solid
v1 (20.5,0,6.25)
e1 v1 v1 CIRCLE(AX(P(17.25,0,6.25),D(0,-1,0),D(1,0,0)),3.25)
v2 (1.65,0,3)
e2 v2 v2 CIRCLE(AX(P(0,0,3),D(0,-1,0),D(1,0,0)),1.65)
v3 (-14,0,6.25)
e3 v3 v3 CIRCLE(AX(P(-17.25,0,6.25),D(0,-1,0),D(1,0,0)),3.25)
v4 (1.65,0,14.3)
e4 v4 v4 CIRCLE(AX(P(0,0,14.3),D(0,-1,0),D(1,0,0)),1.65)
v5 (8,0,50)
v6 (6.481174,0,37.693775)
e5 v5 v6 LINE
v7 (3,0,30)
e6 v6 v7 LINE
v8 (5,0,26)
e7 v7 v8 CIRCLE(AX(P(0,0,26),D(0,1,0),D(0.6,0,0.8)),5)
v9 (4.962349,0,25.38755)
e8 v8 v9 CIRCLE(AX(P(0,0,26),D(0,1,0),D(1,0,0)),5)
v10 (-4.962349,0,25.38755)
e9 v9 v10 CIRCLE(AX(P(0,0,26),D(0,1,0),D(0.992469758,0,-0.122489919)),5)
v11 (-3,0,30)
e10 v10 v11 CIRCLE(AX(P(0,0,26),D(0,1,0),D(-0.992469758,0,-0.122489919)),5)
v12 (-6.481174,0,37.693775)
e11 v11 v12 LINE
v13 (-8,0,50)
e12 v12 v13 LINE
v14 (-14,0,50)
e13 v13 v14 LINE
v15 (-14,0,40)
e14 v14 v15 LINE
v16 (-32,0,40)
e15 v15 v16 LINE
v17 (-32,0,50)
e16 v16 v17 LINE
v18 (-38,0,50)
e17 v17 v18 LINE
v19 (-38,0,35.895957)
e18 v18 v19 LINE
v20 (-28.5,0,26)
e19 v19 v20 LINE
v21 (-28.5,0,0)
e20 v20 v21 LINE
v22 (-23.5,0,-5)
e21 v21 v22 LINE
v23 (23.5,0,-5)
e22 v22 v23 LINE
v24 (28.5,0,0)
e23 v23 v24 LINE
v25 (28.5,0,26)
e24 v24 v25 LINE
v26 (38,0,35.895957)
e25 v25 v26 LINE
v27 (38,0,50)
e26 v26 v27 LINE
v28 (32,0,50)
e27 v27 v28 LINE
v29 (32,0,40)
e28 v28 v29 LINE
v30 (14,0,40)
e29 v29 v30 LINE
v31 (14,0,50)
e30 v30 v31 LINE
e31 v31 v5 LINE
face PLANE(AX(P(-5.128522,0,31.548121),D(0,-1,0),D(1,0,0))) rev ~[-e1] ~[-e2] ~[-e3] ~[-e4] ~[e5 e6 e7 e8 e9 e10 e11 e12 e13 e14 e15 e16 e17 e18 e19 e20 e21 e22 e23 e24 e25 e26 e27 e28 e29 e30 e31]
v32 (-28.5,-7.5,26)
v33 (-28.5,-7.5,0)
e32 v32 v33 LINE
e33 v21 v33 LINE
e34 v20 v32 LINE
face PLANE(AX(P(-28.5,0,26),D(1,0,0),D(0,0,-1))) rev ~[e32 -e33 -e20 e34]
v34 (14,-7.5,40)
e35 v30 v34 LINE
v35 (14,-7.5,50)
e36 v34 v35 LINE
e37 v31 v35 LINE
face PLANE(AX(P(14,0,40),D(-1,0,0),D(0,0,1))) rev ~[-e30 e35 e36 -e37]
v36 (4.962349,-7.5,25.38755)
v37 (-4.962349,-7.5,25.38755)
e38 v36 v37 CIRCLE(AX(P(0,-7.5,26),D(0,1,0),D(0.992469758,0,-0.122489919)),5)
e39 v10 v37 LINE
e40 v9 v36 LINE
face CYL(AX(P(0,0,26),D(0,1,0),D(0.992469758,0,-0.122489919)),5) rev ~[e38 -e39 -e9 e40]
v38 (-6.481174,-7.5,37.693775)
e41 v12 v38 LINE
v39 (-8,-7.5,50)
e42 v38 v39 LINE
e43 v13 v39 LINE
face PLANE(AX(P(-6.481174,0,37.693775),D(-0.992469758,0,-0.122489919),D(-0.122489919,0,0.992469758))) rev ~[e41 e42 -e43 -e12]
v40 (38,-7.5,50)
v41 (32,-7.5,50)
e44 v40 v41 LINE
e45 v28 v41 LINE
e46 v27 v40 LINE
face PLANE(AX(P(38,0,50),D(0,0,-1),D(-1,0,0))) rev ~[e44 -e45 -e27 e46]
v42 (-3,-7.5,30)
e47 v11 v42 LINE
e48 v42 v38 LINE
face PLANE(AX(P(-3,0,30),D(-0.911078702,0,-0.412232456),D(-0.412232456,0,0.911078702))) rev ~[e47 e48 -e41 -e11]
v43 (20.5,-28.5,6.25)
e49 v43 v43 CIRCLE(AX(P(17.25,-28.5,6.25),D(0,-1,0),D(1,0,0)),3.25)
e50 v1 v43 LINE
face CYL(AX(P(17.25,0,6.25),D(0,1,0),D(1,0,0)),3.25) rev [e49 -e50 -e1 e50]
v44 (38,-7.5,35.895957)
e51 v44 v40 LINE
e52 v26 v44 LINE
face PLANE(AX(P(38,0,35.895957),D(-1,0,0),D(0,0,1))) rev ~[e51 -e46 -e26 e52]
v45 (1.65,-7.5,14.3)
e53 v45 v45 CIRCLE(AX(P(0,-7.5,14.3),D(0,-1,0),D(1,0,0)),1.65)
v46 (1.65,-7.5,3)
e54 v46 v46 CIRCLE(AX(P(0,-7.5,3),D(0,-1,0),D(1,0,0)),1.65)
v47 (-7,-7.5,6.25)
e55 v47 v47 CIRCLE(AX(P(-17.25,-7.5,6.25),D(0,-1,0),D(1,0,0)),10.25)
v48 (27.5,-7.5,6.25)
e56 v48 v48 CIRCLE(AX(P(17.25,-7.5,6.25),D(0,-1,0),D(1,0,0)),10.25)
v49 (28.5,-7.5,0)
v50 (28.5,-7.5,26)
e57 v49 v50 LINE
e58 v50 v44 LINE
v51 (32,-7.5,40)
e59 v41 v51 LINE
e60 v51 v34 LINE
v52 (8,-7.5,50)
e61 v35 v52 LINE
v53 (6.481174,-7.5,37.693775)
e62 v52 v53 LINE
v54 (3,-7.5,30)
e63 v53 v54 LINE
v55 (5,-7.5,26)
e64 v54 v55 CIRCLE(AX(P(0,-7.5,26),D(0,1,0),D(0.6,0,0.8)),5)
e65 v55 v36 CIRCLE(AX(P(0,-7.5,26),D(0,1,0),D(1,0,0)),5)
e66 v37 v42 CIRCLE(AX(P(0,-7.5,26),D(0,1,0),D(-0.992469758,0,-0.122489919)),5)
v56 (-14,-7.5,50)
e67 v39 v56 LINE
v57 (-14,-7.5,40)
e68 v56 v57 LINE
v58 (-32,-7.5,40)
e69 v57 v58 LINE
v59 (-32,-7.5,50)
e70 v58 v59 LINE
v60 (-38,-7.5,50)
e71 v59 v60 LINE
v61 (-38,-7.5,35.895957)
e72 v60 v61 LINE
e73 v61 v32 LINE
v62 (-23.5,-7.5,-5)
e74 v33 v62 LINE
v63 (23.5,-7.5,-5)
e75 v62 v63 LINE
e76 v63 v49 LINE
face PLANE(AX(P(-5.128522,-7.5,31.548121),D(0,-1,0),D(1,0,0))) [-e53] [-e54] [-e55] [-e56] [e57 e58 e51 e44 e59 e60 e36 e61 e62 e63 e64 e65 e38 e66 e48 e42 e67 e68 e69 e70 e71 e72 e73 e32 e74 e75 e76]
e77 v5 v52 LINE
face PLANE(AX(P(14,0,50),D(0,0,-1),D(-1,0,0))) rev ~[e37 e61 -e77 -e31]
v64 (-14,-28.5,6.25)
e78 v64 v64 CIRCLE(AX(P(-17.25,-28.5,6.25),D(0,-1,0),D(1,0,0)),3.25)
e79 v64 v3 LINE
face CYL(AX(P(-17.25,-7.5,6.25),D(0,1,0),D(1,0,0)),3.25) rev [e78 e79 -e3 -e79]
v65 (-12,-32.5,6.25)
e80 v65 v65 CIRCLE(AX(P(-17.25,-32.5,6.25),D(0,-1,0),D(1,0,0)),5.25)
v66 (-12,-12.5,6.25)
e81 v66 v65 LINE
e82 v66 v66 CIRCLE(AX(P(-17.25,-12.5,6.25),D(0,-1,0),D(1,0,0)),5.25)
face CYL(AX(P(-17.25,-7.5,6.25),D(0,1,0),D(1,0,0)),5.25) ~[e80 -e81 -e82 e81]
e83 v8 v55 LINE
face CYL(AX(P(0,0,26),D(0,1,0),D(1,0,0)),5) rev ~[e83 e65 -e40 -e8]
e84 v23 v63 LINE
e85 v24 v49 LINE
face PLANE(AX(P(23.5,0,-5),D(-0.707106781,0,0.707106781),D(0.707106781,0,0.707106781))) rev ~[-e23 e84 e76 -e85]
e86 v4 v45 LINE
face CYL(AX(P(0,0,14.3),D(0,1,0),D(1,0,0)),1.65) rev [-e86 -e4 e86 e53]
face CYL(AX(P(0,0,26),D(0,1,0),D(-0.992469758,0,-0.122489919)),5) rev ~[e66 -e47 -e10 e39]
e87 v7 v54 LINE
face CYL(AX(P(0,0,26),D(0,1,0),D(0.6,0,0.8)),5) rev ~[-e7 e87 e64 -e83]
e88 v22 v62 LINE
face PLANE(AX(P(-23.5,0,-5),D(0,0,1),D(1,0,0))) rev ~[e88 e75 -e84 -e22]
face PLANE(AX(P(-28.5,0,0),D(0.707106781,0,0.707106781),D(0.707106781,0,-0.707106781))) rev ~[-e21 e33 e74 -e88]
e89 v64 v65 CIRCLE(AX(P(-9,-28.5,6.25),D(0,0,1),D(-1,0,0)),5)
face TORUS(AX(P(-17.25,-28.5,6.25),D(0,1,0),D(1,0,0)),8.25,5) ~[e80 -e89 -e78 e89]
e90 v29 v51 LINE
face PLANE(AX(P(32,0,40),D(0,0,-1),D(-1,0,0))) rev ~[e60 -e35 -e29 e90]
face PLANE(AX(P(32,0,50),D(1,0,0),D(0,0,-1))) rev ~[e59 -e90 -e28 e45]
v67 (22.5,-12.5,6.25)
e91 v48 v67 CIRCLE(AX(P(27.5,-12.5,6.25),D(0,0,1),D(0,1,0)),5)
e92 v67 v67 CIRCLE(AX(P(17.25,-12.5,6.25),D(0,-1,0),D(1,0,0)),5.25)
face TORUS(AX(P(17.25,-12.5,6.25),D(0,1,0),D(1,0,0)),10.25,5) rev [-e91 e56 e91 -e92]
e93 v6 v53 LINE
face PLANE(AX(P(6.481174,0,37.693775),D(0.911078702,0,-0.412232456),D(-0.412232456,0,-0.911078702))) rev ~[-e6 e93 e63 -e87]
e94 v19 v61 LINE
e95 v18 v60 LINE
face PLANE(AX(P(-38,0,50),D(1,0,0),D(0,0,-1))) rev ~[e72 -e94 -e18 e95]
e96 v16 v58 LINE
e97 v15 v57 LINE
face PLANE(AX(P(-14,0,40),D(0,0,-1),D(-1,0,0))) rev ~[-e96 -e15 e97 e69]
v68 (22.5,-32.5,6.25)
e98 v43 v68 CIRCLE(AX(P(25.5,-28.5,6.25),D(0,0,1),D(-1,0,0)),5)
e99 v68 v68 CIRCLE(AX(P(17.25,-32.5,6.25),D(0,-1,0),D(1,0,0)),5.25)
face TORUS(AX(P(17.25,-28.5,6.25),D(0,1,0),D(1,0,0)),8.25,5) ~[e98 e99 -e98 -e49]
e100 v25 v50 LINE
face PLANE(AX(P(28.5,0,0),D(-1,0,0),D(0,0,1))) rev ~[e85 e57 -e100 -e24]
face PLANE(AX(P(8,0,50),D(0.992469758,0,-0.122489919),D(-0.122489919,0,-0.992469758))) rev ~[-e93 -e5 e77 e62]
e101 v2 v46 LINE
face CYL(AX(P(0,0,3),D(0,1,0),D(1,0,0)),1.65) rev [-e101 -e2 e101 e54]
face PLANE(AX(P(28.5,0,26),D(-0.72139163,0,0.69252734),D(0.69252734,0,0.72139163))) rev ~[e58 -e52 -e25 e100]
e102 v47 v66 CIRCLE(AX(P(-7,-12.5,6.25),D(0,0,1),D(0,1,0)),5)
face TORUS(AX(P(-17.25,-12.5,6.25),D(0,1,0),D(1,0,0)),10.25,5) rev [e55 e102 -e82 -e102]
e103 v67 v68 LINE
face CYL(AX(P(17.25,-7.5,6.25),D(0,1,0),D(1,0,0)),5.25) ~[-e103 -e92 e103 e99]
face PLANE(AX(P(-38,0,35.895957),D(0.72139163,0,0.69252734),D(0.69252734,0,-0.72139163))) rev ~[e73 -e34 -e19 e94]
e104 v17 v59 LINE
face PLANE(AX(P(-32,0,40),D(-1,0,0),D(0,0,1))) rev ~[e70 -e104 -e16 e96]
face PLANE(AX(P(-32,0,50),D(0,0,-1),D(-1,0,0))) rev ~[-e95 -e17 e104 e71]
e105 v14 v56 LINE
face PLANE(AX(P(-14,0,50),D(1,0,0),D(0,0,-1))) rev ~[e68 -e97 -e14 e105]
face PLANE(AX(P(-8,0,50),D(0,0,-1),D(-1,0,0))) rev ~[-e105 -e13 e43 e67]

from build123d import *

# Parameters (mm, degrees)
F0_R     = 3.25
F0_R_2   = 1.65
F1_DEPTH = 7.5
F2_R     = 5.25
F2_R_2   = 3.25
F3_DEPTH = 25


# Not quite as in the source:
# - a fillet or chamfer that OpenCascade refuses, or shapes differently, is made with other operations: its cross-section is extruded or revolved along the edge and cut away or added


with BuildPart() as f1:
    # F0 (on Front) → F1 (new body)
    with BuildSketch(Plane.XZ):
        with BuildLine():
            Line((-3, 30), (-6.4811743939, 37.693775202))
            Line((-6.4811743939, 37.693775202), (-4.9623487879, 25.387550404))
            ThreePointArc((-4.9623487879, 25.387550404), (-4.6009153843, 27.9574416023), (-3, 30))
        make_face()
        with BuildLine():
            Line((4.9623487879, 25.387550404), (6.4811743939, 37.693775202))
            Line((6.4811743939, 37.693775202), (3, 30))
            ThreePointArc((3, 30), (4.472135955, 28.2360679775), (5, 26))
            ThreePointArc((5, 26), (4.9905783202, 25.6931970822), (4.9623487879, 25.387550404))
        make_face()
        with BuildLine():
            Line((-28.5, 0), (-23.5, -5))
            Line((-23.5, -5), (23.5, -5))
            Line((23.5, -5), (28.5, 0))
            Line((28.5, 0), (28.5, 26))
            Line((28.5, 26), (38, 35.8959565787))
            Line((38, 35.8959565787), (38, 50))
            Line((38, 50), (32, 50))
            Line((32, 50), (32, 40))
            Line((32, 40), (14, 40))
            Line((14, 40), (14, 50))
            Line((14, 50), (8, 50))
            Line((8, 50), (6.4811743939, 37.693775202))
            Line((6.4811743939, 37.693775202), (4.9623487879, 25.387550404))
            ThreePointArc((4.9623487879, 25.387550404), (0, 21), (-4.9623487879, 25.387550404))
            Line((-4.9623487879, 25.387550404), (-6.4811743939, 37.693775202))
            Line((-6.4811743939, 37.693775202), (-8, 50))
            Line((-8, 50), (-14, 50))
            Line((-14, 50), (-14, 40))
            Line((-14, 40), (-32, 40))
            Line((-32, 40), (-32, 50))
            Line((-32, 50), (-38, 50))
            Line((-38, 50), (-38, 35.8959565787))
            Line((-38, 35.8959565787), (-28.5, 26))
            Line((-28.5, 26), (-28.5, 0))
        make_face()
        with Locations((-17.25, 6.25)):
            Circle(F0_R, mode=Mode.SUBTRACT)
        with Locations((0, 3)):
            Circle(F0_R_2, mode=Mode.SUBTRACT)
        with Locations((17.25, 6.25)):
            Circle(F0_R, mode=Mode.SUBTRACT)
        with Locations((0, 14.3)):
            Circle(F0_R_2, mode=Mode.SUBTRACT)
    extrude(amount=F1_DEPTH)

    # F2 (on face) → F3 (join)
    with BuildSketch(Plane.XZ.offset(7.5)):
        with Locations((-17.25, 6.25)):
            Circle(F2_R)
        with Locations((-17.25, 6.25)):
            Circle(F2_R_2, mode=Mode.SUBTRACT)
        with Locations((17.25, 6.25)):
            Circle(F2_R)
        with Locations((17.25, 6.25)):
            Circle(F2_R_2, mode=Mode.SUBTRACT)
    extrude(amount=F3_DEPTH)

    # F4: fillet of radius 5 on 4 edges, made by hand

    # F4_s1 → F4_t2 (revolve)
    with BuildSketch(Plane.XY.offset(6.25)):
        with BuildLine():
            ThreePointArc((-7, -7.5), (-10.5355339059, -8.9644660941), (-12, -12.5))
            Line((-12, -12.5), (-12, -7.5))
            Line((-12, -7.5), (-7, -7.5))
        make_face()
    revolve(axis=Axis((-17.25, -7.5, 6.25), (0, -1, 0)))

    # F4_s3 → F4_t4 (revolve)
    with BuildSketch(Plane.XY.offset(6.25)):
        with BuildLine():
            ThreePointArc((27.5, -7.5), (23.9644660941, -8.9644660941), (22.5, -12.5))
            Line((22.5, -12.5), (22.5, -7.5))
            Line((22.5, -7.5), (27.5, -7.5))
        make_face()
    revolve(axis=Axis((17.25, -7.5, 6.25), (0, -1, 0)))

    # F4_s5 → F4_t6 (revolve, cut)
    with BuildSketch(Plane.XY.offset(6.25)):
        with BuildLine():
            ThreePointArc((20.5, -28.5), (21.027864045, -30.7360679775), (22.5, -32.5))
            Line((22.5, -32.5), (20.5, -32.5))
            Line((20.5, -32.5), (20.5, -28.5))
        make_face()
    revolve(axis=Axis((17.25, -32.5, 6.25), (0, -1, 0)), mode=Mode.SUBTRACT)

    # F4_s7 → F4_t8 (revolve, cut)
    with BuildSketch(Plane.XY.offset(6.25)):
        with BuildLine():
            ThreePointArc((-14, -28.5), (-13.472135955, -30.7360679775), (-12, -32.5))
            Line((-12, -32.5), (-14, -32.5))
            Line((-14, -32.5), (-14, -28.5))
        make_face()
    revolve(axis=Axis((-17.25, -32.5, 6.25), (0, -1, 0)), mode=Mode.SUBTRACT)


solid = f1.part
